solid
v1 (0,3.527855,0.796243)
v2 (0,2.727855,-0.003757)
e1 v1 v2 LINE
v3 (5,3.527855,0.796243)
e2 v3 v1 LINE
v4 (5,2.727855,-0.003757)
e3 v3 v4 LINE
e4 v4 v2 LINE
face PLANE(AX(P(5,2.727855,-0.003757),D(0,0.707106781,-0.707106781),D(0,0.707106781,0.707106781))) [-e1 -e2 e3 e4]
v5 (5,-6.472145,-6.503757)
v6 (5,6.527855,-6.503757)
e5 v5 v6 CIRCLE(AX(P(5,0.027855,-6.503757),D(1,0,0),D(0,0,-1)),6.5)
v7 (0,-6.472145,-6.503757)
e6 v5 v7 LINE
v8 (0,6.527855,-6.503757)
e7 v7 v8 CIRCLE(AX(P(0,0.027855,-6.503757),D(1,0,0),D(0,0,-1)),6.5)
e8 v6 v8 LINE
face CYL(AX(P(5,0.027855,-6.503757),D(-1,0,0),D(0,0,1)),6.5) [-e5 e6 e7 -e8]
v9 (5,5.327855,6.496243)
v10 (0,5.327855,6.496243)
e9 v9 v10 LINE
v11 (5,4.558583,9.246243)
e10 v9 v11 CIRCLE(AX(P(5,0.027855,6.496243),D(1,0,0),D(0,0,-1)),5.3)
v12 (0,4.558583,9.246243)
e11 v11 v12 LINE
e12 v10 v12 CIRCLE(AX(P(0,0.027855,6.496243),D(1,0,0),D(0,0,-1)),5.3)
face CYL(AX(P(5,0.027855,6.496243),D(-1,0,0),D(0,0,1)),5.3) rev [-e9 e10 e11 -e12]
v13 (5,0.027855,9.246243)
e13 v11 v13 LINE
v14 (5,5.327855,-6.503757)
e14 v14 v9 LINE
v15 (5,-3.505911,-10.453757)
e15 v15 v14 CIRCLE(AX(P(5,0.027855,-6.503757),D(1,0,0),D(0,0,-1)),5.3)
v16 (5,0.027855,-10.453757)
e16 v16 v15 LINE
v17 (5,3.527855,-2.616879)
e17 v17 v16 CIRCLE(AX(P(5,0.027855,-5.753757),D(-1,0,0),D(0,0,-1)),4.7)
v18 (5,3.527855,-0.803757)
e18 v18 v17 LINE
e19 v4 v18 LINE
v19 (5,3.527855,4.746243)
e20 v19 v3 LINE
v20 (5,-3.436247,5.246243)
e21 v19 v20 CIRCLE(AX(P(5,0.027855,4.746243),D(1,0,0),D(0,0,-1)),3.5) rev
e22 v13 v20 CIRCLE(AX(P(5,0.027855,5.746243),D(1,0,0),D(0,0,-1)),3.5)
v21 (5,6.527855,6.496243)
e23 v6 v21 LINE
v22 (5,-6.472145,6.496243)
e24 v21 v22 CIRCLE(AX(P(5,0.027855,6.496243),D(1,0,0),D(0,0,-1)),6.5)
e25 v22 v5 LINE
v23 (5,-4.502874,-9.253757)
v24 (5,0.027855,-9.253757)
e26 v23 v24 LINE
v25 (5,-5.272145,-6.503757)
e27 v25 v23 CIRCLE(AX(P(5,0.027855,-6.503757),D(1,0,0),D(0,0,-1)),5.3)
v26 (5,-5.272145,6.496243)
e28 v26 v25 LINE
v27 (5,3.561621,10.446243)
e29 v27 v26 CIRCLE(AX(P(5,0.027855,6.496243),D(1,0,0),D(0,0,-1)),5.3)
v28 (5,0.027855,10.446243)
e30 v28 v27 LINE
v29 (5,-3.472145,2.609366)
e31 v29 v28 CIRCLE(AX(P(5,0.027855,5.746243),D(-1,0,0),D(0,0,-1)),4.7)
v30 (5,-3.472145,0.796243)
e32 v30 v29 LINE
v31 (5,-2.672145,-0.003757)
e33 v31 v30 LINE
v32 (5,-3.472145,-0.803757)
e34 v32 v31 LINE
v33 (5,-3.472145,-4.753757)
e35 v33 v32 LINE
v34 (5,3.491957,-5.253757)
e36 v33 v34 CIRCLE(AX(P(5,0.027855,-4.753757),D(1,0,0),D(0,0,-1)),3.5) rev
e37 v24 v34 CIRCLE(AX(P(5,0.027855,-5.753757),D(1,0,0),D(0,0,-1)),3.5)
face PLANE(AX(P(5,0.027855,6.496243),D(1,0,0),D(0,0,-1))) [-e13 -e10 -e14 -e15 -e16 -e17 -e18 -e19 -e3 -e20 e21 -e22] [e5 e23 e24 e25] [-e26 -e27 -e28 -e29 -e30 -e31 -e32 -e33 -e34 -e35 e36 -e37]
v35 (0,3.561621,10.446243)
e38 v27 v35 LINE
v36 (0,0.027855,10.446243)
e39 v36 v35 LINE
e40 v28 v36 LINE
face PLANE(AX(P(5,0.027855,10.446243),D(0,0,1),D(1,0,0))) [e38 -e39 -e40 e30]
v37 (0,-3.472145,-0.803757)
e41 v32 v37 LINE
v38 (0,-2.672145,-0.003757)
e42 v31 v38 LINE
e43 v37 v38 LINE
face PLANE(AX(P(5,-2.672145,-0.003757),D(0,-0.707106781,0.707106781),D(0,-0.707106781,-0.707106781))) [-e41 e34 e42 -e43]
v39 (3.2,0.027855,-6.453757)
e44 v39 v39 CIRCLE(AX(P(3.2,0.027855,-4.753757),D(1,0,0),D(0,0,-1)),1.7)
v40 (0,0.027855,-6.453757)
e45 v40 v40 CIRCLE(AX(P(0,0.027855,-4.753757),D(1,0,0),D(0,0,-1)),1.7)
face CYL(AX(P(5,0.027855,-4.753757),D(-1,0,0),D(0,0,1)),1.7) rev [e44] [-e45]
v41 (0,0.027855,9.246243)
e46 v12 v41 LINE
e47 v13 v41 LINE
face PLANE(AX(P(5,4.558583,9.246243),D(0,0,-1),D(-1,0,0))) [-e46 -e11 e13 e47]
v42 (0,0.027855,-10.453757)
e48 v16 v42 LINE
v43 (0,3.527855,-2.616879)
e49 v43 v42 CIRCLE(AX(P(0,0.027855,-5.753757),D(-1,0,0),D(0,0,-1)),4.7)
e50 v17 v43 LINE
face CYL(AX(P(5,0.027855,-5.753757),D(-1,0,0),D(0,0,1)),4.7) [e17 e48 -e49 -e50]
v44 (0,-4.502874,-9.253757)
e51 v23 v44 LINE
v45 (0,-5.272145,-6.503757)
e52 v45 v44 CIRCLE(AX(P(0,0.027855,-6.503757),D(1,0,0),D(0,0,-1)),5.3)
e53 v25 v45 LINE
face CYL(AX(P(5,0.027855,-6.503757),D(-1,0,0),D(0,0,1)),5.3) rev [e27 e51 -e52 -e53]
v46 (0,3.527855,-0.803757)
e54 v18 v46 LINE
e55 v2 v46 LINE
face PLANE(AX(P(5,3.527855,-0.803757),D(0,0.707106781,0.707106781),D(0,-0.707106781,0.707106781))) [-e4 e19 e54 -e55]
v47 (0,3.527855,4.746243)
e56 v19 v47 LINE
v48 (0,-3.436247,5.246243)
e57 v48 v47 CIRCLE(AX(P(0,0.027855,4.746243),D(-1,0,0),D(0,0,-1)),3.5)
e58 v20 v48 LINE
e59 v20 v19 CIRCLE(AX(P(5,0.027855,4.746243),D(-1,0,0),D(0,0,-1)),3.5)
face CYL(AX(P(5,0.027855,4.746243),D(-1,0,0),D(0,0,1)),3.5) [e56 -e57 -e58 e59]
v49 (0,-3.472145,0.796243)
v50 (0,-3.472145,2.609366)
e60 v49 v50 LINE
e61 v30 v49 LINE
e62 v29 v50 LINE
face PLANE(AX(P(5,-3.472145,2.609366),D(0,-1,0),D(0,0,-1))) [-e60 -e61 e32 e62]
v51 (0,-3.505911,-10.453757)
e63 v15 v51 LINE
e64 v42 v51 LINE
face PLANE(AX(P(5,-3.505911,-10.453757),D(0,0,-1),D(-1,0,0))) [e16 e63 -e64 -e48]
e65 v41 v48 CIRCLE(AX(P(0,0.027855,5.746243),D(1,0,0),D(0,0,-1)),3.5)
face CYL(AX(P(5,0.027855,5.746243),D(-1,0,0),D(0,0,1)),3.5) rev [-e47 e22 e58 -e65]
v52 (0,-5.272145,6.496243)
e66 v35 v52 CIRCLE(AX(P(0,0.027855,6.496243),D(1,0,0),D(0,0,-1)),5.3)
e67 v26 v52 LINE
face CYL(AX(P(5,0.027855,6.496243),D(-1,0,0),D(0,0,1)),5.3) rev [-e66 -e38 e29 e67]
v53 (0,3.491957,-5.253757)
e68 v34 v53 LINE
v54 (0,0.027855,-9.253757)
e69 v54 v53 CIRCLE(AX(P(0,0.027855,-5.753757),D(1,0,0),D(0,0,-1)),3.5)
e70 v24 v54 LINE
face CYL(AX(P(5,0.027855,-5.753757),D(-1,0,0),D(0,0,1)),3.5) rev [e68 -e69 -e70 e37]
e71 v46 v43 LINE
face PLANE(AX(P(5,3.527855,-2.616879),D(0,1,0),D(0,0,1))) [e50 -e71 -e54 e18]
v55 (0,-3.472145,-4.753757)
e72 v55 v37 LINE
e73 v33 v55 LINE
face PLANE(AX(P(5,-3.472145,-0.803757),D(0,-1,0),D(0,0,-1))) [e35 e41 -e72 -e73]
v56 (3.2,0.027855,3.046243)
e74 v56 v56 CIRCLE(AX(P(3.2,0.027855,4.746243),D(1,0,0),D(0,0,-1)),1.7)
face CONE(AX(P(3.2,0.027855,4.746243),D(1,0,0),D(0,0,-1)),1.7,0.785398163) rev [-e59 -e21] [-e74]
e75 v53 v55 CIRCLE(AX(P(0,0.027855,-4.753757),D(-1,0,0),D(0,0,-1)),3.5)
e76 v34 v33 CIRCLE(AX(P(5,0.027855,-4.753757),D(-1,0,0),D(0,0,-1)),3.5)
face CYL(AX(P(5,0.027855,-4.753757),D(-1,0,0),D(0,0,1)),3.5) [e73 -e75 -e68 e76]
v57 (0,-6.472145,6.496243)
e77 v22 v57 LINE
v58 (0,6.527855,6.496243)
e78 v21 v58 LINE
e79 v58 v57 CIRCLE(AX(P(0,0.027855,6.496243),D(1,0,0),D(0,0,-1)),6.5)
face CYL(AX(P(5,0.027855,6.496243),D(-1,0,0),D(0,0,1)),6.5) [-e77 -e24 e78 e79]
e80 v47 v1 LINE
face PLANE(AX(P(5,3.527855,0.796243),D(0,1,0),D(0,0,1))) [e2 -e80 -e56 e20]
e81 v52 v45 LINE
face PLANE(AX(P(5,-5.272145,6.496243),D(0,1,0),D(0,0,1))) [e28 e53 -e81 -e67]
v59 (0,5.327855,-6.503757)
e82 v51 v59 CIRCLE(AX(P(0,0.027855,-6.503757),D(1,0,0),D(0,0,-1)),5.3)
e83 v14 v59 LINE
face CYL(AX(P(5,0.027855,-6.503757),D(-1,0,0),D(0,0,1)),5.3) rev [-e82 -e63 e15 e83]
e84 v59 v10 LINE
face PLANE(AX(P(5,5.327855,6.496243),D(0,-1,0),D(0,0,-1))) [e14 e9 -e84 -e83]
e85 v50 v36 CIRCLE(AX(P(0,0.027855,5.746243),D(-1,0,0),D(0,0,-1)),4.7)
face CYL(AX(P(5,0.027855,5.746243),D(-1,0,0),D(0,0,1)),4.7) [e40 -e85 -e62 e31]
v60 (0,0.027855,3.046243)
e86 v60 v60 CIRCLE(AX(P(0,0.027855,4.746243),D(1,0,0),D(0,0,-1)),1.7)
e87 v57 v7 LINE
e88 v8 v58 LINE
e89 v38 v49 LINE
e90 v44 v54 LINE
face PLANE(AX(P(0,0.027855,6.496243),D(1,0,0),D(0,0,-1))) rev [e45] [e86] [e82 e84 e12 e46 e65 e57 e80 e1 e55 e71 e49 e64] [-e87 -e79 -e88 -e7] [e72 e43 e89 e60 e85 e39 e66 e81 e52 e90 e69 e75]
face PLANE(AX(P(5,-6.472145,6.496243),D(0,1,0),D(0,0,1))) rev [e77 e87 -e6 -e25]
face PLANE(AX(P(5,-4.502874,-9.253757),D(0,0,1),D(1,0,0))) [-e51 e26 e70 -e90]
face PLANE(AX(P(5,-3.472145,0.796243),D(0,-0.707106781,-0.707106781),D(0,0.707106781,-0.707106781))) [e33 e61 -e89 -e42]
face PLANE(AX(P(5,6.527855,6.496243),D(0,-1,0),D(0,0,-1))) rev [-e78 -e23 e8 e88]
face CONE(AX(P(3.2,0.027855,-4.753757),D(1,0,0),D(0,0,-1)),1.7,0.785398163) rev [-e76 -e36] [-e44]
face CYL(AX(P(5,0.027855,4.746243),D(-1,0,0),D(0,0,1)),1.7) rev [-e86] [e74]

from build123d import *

# Parameters (mm, degrees)
SKETCH2_R           = 1.7
BOSS_EXTRUDE2_DEPTH = 5
CHAMFER1_SIZE       = 1.8


with BuildPart() as part:
    # Sketch2 → Boss-Extrude2 (new body)
    with BuildSketch(Plane.YZ):
        with BuildLine():
            Line((-6.472145094, 6.496243265), (-6.472145094, -6.503756735))
            ThreePointArc((-6.472145094, -6.503756735), (0.027854906, -13.003756735), (6.527854906, -6.503756735))
            Line((6.527854906, -6.503756735), (6.527854906, 6.496243265))
            ThreePointArc((6.527854906, 6.496243265), (0.027854906, 12.996243265), (-6.472145094, 6.496243265))
        make_face()
        with Locations(Location((0.027854906, 4.746243265, 0), (0, 0, 270))):
            Circle(SKETCH2_R, mode=Mode.SUBTRACT)
        with Locations(Location((0.027854906, -4.753756735, 0), (0, 0, 270))):
            Circle(SKETCH2_R, mode=Mode.SUBTRACT)
        with BuildLine():
            Line((-5.272145094, 6.496243265), (-5.272145094, -6.503756735))
            ThreePointArc((-5.272145094, -6.503756735), (-5.076205272, -7.931541625), (-4.502873512, -9.253756735))
            Line((-4.502873512, -9.253756735), (0.027854906, -9.253756735))
            ThreePointArc((0.027854906, -9.253756735), (2.673606218, -8.045044583), (3.491956522, -5.253756735))
            ThreePointArc((3.491956522, -5.253756735), (-0.222788612, -8.244770603), (-3.472145094, -4.753756735))
            Line((-3.472145094, -4.753756735), (-3.472145094, -0.803756735))
            Line((-3.472145094, -0.803756735), (-2.672145094, -0.003756735))
            Line((-2.672145094, -0.003756735), (-3.472145094, 0.796243265))
            Line((-3.472145094, 0.796243265), (-3.472145094, 2.609365837))
            ThreePointArc((-3.472145094, 2.609365837), (-4.263608941, 7.662838695), (0.027854906, 10.446243265))
            Line((0.027854906, 10.446243265), (3.561620603, 10.446243265))
            ThreePointArc((3.561620603, 10.446243265), (-2.135596249, 11.334577596), (-5.272145094, 6.496243265))
        make_face(mode=Mode.SUBTRACT)
        with BuildLine():
            Line((4.558583325, 9.246243265), (0.027854906, 9.246243265))
            ThreePointArc((0.027854906, 9.246243265), (-2.617896405, 8.037531112), (-3.436246709, 5.246243265))
            ThreePointArc((-3.436246709, 5.246243265), (0.278498425, 8.237257133), (3.527854906, 4.746243265))
            Line((3.527854906, 4.746243265), (3.527854906, 0.796243265))
            Line((3.527854906, 0.796243265), (2.727854906, -0.003756735))
            Line((2.727854906, -0.003756735), (3.527854906, -0.803756735))
            Line((3.527854906, -0.803756735), (3.527854906, -2.616879307))
            ThreePointArc((3.527854906, -2.616879307), (4.319318754, -7.670352166), (0.027854906, -10.453756735))
            Line((0.027854906, -10.453756735), (-3.50591079, -10.453756735))
            ThreePointArc((-3.50591079, -10.453756735), (2.191306062, -11.342091066), (5.327854906, -6.503756735))
            Line((5.327854906, -6.503756735), (5.327854906, 6.496243265))
            ThreePointArc((5.327854906, 6.496243265), (5.131915085, 7.924028155), (4.558583325, 9.246243265))
        make_face(mode=Mode.SUBTRACT)
    extrude(amount=BOSS_EXTRUDE2_DEPTH)

    # Chamfer1
    chamfer1_edges = [part.edges().sort_by_distance(p)[0] for p in [
        (5, 0.027854906, 6.446243265),
        (5, 0.027854906, -3.053756735),
    ]]
    chamfer(chamfer1_edges, length=CHAMFER1_SIZE - 0.0001)  # a hair under: the kernel refuses the full size


solid = part.part
